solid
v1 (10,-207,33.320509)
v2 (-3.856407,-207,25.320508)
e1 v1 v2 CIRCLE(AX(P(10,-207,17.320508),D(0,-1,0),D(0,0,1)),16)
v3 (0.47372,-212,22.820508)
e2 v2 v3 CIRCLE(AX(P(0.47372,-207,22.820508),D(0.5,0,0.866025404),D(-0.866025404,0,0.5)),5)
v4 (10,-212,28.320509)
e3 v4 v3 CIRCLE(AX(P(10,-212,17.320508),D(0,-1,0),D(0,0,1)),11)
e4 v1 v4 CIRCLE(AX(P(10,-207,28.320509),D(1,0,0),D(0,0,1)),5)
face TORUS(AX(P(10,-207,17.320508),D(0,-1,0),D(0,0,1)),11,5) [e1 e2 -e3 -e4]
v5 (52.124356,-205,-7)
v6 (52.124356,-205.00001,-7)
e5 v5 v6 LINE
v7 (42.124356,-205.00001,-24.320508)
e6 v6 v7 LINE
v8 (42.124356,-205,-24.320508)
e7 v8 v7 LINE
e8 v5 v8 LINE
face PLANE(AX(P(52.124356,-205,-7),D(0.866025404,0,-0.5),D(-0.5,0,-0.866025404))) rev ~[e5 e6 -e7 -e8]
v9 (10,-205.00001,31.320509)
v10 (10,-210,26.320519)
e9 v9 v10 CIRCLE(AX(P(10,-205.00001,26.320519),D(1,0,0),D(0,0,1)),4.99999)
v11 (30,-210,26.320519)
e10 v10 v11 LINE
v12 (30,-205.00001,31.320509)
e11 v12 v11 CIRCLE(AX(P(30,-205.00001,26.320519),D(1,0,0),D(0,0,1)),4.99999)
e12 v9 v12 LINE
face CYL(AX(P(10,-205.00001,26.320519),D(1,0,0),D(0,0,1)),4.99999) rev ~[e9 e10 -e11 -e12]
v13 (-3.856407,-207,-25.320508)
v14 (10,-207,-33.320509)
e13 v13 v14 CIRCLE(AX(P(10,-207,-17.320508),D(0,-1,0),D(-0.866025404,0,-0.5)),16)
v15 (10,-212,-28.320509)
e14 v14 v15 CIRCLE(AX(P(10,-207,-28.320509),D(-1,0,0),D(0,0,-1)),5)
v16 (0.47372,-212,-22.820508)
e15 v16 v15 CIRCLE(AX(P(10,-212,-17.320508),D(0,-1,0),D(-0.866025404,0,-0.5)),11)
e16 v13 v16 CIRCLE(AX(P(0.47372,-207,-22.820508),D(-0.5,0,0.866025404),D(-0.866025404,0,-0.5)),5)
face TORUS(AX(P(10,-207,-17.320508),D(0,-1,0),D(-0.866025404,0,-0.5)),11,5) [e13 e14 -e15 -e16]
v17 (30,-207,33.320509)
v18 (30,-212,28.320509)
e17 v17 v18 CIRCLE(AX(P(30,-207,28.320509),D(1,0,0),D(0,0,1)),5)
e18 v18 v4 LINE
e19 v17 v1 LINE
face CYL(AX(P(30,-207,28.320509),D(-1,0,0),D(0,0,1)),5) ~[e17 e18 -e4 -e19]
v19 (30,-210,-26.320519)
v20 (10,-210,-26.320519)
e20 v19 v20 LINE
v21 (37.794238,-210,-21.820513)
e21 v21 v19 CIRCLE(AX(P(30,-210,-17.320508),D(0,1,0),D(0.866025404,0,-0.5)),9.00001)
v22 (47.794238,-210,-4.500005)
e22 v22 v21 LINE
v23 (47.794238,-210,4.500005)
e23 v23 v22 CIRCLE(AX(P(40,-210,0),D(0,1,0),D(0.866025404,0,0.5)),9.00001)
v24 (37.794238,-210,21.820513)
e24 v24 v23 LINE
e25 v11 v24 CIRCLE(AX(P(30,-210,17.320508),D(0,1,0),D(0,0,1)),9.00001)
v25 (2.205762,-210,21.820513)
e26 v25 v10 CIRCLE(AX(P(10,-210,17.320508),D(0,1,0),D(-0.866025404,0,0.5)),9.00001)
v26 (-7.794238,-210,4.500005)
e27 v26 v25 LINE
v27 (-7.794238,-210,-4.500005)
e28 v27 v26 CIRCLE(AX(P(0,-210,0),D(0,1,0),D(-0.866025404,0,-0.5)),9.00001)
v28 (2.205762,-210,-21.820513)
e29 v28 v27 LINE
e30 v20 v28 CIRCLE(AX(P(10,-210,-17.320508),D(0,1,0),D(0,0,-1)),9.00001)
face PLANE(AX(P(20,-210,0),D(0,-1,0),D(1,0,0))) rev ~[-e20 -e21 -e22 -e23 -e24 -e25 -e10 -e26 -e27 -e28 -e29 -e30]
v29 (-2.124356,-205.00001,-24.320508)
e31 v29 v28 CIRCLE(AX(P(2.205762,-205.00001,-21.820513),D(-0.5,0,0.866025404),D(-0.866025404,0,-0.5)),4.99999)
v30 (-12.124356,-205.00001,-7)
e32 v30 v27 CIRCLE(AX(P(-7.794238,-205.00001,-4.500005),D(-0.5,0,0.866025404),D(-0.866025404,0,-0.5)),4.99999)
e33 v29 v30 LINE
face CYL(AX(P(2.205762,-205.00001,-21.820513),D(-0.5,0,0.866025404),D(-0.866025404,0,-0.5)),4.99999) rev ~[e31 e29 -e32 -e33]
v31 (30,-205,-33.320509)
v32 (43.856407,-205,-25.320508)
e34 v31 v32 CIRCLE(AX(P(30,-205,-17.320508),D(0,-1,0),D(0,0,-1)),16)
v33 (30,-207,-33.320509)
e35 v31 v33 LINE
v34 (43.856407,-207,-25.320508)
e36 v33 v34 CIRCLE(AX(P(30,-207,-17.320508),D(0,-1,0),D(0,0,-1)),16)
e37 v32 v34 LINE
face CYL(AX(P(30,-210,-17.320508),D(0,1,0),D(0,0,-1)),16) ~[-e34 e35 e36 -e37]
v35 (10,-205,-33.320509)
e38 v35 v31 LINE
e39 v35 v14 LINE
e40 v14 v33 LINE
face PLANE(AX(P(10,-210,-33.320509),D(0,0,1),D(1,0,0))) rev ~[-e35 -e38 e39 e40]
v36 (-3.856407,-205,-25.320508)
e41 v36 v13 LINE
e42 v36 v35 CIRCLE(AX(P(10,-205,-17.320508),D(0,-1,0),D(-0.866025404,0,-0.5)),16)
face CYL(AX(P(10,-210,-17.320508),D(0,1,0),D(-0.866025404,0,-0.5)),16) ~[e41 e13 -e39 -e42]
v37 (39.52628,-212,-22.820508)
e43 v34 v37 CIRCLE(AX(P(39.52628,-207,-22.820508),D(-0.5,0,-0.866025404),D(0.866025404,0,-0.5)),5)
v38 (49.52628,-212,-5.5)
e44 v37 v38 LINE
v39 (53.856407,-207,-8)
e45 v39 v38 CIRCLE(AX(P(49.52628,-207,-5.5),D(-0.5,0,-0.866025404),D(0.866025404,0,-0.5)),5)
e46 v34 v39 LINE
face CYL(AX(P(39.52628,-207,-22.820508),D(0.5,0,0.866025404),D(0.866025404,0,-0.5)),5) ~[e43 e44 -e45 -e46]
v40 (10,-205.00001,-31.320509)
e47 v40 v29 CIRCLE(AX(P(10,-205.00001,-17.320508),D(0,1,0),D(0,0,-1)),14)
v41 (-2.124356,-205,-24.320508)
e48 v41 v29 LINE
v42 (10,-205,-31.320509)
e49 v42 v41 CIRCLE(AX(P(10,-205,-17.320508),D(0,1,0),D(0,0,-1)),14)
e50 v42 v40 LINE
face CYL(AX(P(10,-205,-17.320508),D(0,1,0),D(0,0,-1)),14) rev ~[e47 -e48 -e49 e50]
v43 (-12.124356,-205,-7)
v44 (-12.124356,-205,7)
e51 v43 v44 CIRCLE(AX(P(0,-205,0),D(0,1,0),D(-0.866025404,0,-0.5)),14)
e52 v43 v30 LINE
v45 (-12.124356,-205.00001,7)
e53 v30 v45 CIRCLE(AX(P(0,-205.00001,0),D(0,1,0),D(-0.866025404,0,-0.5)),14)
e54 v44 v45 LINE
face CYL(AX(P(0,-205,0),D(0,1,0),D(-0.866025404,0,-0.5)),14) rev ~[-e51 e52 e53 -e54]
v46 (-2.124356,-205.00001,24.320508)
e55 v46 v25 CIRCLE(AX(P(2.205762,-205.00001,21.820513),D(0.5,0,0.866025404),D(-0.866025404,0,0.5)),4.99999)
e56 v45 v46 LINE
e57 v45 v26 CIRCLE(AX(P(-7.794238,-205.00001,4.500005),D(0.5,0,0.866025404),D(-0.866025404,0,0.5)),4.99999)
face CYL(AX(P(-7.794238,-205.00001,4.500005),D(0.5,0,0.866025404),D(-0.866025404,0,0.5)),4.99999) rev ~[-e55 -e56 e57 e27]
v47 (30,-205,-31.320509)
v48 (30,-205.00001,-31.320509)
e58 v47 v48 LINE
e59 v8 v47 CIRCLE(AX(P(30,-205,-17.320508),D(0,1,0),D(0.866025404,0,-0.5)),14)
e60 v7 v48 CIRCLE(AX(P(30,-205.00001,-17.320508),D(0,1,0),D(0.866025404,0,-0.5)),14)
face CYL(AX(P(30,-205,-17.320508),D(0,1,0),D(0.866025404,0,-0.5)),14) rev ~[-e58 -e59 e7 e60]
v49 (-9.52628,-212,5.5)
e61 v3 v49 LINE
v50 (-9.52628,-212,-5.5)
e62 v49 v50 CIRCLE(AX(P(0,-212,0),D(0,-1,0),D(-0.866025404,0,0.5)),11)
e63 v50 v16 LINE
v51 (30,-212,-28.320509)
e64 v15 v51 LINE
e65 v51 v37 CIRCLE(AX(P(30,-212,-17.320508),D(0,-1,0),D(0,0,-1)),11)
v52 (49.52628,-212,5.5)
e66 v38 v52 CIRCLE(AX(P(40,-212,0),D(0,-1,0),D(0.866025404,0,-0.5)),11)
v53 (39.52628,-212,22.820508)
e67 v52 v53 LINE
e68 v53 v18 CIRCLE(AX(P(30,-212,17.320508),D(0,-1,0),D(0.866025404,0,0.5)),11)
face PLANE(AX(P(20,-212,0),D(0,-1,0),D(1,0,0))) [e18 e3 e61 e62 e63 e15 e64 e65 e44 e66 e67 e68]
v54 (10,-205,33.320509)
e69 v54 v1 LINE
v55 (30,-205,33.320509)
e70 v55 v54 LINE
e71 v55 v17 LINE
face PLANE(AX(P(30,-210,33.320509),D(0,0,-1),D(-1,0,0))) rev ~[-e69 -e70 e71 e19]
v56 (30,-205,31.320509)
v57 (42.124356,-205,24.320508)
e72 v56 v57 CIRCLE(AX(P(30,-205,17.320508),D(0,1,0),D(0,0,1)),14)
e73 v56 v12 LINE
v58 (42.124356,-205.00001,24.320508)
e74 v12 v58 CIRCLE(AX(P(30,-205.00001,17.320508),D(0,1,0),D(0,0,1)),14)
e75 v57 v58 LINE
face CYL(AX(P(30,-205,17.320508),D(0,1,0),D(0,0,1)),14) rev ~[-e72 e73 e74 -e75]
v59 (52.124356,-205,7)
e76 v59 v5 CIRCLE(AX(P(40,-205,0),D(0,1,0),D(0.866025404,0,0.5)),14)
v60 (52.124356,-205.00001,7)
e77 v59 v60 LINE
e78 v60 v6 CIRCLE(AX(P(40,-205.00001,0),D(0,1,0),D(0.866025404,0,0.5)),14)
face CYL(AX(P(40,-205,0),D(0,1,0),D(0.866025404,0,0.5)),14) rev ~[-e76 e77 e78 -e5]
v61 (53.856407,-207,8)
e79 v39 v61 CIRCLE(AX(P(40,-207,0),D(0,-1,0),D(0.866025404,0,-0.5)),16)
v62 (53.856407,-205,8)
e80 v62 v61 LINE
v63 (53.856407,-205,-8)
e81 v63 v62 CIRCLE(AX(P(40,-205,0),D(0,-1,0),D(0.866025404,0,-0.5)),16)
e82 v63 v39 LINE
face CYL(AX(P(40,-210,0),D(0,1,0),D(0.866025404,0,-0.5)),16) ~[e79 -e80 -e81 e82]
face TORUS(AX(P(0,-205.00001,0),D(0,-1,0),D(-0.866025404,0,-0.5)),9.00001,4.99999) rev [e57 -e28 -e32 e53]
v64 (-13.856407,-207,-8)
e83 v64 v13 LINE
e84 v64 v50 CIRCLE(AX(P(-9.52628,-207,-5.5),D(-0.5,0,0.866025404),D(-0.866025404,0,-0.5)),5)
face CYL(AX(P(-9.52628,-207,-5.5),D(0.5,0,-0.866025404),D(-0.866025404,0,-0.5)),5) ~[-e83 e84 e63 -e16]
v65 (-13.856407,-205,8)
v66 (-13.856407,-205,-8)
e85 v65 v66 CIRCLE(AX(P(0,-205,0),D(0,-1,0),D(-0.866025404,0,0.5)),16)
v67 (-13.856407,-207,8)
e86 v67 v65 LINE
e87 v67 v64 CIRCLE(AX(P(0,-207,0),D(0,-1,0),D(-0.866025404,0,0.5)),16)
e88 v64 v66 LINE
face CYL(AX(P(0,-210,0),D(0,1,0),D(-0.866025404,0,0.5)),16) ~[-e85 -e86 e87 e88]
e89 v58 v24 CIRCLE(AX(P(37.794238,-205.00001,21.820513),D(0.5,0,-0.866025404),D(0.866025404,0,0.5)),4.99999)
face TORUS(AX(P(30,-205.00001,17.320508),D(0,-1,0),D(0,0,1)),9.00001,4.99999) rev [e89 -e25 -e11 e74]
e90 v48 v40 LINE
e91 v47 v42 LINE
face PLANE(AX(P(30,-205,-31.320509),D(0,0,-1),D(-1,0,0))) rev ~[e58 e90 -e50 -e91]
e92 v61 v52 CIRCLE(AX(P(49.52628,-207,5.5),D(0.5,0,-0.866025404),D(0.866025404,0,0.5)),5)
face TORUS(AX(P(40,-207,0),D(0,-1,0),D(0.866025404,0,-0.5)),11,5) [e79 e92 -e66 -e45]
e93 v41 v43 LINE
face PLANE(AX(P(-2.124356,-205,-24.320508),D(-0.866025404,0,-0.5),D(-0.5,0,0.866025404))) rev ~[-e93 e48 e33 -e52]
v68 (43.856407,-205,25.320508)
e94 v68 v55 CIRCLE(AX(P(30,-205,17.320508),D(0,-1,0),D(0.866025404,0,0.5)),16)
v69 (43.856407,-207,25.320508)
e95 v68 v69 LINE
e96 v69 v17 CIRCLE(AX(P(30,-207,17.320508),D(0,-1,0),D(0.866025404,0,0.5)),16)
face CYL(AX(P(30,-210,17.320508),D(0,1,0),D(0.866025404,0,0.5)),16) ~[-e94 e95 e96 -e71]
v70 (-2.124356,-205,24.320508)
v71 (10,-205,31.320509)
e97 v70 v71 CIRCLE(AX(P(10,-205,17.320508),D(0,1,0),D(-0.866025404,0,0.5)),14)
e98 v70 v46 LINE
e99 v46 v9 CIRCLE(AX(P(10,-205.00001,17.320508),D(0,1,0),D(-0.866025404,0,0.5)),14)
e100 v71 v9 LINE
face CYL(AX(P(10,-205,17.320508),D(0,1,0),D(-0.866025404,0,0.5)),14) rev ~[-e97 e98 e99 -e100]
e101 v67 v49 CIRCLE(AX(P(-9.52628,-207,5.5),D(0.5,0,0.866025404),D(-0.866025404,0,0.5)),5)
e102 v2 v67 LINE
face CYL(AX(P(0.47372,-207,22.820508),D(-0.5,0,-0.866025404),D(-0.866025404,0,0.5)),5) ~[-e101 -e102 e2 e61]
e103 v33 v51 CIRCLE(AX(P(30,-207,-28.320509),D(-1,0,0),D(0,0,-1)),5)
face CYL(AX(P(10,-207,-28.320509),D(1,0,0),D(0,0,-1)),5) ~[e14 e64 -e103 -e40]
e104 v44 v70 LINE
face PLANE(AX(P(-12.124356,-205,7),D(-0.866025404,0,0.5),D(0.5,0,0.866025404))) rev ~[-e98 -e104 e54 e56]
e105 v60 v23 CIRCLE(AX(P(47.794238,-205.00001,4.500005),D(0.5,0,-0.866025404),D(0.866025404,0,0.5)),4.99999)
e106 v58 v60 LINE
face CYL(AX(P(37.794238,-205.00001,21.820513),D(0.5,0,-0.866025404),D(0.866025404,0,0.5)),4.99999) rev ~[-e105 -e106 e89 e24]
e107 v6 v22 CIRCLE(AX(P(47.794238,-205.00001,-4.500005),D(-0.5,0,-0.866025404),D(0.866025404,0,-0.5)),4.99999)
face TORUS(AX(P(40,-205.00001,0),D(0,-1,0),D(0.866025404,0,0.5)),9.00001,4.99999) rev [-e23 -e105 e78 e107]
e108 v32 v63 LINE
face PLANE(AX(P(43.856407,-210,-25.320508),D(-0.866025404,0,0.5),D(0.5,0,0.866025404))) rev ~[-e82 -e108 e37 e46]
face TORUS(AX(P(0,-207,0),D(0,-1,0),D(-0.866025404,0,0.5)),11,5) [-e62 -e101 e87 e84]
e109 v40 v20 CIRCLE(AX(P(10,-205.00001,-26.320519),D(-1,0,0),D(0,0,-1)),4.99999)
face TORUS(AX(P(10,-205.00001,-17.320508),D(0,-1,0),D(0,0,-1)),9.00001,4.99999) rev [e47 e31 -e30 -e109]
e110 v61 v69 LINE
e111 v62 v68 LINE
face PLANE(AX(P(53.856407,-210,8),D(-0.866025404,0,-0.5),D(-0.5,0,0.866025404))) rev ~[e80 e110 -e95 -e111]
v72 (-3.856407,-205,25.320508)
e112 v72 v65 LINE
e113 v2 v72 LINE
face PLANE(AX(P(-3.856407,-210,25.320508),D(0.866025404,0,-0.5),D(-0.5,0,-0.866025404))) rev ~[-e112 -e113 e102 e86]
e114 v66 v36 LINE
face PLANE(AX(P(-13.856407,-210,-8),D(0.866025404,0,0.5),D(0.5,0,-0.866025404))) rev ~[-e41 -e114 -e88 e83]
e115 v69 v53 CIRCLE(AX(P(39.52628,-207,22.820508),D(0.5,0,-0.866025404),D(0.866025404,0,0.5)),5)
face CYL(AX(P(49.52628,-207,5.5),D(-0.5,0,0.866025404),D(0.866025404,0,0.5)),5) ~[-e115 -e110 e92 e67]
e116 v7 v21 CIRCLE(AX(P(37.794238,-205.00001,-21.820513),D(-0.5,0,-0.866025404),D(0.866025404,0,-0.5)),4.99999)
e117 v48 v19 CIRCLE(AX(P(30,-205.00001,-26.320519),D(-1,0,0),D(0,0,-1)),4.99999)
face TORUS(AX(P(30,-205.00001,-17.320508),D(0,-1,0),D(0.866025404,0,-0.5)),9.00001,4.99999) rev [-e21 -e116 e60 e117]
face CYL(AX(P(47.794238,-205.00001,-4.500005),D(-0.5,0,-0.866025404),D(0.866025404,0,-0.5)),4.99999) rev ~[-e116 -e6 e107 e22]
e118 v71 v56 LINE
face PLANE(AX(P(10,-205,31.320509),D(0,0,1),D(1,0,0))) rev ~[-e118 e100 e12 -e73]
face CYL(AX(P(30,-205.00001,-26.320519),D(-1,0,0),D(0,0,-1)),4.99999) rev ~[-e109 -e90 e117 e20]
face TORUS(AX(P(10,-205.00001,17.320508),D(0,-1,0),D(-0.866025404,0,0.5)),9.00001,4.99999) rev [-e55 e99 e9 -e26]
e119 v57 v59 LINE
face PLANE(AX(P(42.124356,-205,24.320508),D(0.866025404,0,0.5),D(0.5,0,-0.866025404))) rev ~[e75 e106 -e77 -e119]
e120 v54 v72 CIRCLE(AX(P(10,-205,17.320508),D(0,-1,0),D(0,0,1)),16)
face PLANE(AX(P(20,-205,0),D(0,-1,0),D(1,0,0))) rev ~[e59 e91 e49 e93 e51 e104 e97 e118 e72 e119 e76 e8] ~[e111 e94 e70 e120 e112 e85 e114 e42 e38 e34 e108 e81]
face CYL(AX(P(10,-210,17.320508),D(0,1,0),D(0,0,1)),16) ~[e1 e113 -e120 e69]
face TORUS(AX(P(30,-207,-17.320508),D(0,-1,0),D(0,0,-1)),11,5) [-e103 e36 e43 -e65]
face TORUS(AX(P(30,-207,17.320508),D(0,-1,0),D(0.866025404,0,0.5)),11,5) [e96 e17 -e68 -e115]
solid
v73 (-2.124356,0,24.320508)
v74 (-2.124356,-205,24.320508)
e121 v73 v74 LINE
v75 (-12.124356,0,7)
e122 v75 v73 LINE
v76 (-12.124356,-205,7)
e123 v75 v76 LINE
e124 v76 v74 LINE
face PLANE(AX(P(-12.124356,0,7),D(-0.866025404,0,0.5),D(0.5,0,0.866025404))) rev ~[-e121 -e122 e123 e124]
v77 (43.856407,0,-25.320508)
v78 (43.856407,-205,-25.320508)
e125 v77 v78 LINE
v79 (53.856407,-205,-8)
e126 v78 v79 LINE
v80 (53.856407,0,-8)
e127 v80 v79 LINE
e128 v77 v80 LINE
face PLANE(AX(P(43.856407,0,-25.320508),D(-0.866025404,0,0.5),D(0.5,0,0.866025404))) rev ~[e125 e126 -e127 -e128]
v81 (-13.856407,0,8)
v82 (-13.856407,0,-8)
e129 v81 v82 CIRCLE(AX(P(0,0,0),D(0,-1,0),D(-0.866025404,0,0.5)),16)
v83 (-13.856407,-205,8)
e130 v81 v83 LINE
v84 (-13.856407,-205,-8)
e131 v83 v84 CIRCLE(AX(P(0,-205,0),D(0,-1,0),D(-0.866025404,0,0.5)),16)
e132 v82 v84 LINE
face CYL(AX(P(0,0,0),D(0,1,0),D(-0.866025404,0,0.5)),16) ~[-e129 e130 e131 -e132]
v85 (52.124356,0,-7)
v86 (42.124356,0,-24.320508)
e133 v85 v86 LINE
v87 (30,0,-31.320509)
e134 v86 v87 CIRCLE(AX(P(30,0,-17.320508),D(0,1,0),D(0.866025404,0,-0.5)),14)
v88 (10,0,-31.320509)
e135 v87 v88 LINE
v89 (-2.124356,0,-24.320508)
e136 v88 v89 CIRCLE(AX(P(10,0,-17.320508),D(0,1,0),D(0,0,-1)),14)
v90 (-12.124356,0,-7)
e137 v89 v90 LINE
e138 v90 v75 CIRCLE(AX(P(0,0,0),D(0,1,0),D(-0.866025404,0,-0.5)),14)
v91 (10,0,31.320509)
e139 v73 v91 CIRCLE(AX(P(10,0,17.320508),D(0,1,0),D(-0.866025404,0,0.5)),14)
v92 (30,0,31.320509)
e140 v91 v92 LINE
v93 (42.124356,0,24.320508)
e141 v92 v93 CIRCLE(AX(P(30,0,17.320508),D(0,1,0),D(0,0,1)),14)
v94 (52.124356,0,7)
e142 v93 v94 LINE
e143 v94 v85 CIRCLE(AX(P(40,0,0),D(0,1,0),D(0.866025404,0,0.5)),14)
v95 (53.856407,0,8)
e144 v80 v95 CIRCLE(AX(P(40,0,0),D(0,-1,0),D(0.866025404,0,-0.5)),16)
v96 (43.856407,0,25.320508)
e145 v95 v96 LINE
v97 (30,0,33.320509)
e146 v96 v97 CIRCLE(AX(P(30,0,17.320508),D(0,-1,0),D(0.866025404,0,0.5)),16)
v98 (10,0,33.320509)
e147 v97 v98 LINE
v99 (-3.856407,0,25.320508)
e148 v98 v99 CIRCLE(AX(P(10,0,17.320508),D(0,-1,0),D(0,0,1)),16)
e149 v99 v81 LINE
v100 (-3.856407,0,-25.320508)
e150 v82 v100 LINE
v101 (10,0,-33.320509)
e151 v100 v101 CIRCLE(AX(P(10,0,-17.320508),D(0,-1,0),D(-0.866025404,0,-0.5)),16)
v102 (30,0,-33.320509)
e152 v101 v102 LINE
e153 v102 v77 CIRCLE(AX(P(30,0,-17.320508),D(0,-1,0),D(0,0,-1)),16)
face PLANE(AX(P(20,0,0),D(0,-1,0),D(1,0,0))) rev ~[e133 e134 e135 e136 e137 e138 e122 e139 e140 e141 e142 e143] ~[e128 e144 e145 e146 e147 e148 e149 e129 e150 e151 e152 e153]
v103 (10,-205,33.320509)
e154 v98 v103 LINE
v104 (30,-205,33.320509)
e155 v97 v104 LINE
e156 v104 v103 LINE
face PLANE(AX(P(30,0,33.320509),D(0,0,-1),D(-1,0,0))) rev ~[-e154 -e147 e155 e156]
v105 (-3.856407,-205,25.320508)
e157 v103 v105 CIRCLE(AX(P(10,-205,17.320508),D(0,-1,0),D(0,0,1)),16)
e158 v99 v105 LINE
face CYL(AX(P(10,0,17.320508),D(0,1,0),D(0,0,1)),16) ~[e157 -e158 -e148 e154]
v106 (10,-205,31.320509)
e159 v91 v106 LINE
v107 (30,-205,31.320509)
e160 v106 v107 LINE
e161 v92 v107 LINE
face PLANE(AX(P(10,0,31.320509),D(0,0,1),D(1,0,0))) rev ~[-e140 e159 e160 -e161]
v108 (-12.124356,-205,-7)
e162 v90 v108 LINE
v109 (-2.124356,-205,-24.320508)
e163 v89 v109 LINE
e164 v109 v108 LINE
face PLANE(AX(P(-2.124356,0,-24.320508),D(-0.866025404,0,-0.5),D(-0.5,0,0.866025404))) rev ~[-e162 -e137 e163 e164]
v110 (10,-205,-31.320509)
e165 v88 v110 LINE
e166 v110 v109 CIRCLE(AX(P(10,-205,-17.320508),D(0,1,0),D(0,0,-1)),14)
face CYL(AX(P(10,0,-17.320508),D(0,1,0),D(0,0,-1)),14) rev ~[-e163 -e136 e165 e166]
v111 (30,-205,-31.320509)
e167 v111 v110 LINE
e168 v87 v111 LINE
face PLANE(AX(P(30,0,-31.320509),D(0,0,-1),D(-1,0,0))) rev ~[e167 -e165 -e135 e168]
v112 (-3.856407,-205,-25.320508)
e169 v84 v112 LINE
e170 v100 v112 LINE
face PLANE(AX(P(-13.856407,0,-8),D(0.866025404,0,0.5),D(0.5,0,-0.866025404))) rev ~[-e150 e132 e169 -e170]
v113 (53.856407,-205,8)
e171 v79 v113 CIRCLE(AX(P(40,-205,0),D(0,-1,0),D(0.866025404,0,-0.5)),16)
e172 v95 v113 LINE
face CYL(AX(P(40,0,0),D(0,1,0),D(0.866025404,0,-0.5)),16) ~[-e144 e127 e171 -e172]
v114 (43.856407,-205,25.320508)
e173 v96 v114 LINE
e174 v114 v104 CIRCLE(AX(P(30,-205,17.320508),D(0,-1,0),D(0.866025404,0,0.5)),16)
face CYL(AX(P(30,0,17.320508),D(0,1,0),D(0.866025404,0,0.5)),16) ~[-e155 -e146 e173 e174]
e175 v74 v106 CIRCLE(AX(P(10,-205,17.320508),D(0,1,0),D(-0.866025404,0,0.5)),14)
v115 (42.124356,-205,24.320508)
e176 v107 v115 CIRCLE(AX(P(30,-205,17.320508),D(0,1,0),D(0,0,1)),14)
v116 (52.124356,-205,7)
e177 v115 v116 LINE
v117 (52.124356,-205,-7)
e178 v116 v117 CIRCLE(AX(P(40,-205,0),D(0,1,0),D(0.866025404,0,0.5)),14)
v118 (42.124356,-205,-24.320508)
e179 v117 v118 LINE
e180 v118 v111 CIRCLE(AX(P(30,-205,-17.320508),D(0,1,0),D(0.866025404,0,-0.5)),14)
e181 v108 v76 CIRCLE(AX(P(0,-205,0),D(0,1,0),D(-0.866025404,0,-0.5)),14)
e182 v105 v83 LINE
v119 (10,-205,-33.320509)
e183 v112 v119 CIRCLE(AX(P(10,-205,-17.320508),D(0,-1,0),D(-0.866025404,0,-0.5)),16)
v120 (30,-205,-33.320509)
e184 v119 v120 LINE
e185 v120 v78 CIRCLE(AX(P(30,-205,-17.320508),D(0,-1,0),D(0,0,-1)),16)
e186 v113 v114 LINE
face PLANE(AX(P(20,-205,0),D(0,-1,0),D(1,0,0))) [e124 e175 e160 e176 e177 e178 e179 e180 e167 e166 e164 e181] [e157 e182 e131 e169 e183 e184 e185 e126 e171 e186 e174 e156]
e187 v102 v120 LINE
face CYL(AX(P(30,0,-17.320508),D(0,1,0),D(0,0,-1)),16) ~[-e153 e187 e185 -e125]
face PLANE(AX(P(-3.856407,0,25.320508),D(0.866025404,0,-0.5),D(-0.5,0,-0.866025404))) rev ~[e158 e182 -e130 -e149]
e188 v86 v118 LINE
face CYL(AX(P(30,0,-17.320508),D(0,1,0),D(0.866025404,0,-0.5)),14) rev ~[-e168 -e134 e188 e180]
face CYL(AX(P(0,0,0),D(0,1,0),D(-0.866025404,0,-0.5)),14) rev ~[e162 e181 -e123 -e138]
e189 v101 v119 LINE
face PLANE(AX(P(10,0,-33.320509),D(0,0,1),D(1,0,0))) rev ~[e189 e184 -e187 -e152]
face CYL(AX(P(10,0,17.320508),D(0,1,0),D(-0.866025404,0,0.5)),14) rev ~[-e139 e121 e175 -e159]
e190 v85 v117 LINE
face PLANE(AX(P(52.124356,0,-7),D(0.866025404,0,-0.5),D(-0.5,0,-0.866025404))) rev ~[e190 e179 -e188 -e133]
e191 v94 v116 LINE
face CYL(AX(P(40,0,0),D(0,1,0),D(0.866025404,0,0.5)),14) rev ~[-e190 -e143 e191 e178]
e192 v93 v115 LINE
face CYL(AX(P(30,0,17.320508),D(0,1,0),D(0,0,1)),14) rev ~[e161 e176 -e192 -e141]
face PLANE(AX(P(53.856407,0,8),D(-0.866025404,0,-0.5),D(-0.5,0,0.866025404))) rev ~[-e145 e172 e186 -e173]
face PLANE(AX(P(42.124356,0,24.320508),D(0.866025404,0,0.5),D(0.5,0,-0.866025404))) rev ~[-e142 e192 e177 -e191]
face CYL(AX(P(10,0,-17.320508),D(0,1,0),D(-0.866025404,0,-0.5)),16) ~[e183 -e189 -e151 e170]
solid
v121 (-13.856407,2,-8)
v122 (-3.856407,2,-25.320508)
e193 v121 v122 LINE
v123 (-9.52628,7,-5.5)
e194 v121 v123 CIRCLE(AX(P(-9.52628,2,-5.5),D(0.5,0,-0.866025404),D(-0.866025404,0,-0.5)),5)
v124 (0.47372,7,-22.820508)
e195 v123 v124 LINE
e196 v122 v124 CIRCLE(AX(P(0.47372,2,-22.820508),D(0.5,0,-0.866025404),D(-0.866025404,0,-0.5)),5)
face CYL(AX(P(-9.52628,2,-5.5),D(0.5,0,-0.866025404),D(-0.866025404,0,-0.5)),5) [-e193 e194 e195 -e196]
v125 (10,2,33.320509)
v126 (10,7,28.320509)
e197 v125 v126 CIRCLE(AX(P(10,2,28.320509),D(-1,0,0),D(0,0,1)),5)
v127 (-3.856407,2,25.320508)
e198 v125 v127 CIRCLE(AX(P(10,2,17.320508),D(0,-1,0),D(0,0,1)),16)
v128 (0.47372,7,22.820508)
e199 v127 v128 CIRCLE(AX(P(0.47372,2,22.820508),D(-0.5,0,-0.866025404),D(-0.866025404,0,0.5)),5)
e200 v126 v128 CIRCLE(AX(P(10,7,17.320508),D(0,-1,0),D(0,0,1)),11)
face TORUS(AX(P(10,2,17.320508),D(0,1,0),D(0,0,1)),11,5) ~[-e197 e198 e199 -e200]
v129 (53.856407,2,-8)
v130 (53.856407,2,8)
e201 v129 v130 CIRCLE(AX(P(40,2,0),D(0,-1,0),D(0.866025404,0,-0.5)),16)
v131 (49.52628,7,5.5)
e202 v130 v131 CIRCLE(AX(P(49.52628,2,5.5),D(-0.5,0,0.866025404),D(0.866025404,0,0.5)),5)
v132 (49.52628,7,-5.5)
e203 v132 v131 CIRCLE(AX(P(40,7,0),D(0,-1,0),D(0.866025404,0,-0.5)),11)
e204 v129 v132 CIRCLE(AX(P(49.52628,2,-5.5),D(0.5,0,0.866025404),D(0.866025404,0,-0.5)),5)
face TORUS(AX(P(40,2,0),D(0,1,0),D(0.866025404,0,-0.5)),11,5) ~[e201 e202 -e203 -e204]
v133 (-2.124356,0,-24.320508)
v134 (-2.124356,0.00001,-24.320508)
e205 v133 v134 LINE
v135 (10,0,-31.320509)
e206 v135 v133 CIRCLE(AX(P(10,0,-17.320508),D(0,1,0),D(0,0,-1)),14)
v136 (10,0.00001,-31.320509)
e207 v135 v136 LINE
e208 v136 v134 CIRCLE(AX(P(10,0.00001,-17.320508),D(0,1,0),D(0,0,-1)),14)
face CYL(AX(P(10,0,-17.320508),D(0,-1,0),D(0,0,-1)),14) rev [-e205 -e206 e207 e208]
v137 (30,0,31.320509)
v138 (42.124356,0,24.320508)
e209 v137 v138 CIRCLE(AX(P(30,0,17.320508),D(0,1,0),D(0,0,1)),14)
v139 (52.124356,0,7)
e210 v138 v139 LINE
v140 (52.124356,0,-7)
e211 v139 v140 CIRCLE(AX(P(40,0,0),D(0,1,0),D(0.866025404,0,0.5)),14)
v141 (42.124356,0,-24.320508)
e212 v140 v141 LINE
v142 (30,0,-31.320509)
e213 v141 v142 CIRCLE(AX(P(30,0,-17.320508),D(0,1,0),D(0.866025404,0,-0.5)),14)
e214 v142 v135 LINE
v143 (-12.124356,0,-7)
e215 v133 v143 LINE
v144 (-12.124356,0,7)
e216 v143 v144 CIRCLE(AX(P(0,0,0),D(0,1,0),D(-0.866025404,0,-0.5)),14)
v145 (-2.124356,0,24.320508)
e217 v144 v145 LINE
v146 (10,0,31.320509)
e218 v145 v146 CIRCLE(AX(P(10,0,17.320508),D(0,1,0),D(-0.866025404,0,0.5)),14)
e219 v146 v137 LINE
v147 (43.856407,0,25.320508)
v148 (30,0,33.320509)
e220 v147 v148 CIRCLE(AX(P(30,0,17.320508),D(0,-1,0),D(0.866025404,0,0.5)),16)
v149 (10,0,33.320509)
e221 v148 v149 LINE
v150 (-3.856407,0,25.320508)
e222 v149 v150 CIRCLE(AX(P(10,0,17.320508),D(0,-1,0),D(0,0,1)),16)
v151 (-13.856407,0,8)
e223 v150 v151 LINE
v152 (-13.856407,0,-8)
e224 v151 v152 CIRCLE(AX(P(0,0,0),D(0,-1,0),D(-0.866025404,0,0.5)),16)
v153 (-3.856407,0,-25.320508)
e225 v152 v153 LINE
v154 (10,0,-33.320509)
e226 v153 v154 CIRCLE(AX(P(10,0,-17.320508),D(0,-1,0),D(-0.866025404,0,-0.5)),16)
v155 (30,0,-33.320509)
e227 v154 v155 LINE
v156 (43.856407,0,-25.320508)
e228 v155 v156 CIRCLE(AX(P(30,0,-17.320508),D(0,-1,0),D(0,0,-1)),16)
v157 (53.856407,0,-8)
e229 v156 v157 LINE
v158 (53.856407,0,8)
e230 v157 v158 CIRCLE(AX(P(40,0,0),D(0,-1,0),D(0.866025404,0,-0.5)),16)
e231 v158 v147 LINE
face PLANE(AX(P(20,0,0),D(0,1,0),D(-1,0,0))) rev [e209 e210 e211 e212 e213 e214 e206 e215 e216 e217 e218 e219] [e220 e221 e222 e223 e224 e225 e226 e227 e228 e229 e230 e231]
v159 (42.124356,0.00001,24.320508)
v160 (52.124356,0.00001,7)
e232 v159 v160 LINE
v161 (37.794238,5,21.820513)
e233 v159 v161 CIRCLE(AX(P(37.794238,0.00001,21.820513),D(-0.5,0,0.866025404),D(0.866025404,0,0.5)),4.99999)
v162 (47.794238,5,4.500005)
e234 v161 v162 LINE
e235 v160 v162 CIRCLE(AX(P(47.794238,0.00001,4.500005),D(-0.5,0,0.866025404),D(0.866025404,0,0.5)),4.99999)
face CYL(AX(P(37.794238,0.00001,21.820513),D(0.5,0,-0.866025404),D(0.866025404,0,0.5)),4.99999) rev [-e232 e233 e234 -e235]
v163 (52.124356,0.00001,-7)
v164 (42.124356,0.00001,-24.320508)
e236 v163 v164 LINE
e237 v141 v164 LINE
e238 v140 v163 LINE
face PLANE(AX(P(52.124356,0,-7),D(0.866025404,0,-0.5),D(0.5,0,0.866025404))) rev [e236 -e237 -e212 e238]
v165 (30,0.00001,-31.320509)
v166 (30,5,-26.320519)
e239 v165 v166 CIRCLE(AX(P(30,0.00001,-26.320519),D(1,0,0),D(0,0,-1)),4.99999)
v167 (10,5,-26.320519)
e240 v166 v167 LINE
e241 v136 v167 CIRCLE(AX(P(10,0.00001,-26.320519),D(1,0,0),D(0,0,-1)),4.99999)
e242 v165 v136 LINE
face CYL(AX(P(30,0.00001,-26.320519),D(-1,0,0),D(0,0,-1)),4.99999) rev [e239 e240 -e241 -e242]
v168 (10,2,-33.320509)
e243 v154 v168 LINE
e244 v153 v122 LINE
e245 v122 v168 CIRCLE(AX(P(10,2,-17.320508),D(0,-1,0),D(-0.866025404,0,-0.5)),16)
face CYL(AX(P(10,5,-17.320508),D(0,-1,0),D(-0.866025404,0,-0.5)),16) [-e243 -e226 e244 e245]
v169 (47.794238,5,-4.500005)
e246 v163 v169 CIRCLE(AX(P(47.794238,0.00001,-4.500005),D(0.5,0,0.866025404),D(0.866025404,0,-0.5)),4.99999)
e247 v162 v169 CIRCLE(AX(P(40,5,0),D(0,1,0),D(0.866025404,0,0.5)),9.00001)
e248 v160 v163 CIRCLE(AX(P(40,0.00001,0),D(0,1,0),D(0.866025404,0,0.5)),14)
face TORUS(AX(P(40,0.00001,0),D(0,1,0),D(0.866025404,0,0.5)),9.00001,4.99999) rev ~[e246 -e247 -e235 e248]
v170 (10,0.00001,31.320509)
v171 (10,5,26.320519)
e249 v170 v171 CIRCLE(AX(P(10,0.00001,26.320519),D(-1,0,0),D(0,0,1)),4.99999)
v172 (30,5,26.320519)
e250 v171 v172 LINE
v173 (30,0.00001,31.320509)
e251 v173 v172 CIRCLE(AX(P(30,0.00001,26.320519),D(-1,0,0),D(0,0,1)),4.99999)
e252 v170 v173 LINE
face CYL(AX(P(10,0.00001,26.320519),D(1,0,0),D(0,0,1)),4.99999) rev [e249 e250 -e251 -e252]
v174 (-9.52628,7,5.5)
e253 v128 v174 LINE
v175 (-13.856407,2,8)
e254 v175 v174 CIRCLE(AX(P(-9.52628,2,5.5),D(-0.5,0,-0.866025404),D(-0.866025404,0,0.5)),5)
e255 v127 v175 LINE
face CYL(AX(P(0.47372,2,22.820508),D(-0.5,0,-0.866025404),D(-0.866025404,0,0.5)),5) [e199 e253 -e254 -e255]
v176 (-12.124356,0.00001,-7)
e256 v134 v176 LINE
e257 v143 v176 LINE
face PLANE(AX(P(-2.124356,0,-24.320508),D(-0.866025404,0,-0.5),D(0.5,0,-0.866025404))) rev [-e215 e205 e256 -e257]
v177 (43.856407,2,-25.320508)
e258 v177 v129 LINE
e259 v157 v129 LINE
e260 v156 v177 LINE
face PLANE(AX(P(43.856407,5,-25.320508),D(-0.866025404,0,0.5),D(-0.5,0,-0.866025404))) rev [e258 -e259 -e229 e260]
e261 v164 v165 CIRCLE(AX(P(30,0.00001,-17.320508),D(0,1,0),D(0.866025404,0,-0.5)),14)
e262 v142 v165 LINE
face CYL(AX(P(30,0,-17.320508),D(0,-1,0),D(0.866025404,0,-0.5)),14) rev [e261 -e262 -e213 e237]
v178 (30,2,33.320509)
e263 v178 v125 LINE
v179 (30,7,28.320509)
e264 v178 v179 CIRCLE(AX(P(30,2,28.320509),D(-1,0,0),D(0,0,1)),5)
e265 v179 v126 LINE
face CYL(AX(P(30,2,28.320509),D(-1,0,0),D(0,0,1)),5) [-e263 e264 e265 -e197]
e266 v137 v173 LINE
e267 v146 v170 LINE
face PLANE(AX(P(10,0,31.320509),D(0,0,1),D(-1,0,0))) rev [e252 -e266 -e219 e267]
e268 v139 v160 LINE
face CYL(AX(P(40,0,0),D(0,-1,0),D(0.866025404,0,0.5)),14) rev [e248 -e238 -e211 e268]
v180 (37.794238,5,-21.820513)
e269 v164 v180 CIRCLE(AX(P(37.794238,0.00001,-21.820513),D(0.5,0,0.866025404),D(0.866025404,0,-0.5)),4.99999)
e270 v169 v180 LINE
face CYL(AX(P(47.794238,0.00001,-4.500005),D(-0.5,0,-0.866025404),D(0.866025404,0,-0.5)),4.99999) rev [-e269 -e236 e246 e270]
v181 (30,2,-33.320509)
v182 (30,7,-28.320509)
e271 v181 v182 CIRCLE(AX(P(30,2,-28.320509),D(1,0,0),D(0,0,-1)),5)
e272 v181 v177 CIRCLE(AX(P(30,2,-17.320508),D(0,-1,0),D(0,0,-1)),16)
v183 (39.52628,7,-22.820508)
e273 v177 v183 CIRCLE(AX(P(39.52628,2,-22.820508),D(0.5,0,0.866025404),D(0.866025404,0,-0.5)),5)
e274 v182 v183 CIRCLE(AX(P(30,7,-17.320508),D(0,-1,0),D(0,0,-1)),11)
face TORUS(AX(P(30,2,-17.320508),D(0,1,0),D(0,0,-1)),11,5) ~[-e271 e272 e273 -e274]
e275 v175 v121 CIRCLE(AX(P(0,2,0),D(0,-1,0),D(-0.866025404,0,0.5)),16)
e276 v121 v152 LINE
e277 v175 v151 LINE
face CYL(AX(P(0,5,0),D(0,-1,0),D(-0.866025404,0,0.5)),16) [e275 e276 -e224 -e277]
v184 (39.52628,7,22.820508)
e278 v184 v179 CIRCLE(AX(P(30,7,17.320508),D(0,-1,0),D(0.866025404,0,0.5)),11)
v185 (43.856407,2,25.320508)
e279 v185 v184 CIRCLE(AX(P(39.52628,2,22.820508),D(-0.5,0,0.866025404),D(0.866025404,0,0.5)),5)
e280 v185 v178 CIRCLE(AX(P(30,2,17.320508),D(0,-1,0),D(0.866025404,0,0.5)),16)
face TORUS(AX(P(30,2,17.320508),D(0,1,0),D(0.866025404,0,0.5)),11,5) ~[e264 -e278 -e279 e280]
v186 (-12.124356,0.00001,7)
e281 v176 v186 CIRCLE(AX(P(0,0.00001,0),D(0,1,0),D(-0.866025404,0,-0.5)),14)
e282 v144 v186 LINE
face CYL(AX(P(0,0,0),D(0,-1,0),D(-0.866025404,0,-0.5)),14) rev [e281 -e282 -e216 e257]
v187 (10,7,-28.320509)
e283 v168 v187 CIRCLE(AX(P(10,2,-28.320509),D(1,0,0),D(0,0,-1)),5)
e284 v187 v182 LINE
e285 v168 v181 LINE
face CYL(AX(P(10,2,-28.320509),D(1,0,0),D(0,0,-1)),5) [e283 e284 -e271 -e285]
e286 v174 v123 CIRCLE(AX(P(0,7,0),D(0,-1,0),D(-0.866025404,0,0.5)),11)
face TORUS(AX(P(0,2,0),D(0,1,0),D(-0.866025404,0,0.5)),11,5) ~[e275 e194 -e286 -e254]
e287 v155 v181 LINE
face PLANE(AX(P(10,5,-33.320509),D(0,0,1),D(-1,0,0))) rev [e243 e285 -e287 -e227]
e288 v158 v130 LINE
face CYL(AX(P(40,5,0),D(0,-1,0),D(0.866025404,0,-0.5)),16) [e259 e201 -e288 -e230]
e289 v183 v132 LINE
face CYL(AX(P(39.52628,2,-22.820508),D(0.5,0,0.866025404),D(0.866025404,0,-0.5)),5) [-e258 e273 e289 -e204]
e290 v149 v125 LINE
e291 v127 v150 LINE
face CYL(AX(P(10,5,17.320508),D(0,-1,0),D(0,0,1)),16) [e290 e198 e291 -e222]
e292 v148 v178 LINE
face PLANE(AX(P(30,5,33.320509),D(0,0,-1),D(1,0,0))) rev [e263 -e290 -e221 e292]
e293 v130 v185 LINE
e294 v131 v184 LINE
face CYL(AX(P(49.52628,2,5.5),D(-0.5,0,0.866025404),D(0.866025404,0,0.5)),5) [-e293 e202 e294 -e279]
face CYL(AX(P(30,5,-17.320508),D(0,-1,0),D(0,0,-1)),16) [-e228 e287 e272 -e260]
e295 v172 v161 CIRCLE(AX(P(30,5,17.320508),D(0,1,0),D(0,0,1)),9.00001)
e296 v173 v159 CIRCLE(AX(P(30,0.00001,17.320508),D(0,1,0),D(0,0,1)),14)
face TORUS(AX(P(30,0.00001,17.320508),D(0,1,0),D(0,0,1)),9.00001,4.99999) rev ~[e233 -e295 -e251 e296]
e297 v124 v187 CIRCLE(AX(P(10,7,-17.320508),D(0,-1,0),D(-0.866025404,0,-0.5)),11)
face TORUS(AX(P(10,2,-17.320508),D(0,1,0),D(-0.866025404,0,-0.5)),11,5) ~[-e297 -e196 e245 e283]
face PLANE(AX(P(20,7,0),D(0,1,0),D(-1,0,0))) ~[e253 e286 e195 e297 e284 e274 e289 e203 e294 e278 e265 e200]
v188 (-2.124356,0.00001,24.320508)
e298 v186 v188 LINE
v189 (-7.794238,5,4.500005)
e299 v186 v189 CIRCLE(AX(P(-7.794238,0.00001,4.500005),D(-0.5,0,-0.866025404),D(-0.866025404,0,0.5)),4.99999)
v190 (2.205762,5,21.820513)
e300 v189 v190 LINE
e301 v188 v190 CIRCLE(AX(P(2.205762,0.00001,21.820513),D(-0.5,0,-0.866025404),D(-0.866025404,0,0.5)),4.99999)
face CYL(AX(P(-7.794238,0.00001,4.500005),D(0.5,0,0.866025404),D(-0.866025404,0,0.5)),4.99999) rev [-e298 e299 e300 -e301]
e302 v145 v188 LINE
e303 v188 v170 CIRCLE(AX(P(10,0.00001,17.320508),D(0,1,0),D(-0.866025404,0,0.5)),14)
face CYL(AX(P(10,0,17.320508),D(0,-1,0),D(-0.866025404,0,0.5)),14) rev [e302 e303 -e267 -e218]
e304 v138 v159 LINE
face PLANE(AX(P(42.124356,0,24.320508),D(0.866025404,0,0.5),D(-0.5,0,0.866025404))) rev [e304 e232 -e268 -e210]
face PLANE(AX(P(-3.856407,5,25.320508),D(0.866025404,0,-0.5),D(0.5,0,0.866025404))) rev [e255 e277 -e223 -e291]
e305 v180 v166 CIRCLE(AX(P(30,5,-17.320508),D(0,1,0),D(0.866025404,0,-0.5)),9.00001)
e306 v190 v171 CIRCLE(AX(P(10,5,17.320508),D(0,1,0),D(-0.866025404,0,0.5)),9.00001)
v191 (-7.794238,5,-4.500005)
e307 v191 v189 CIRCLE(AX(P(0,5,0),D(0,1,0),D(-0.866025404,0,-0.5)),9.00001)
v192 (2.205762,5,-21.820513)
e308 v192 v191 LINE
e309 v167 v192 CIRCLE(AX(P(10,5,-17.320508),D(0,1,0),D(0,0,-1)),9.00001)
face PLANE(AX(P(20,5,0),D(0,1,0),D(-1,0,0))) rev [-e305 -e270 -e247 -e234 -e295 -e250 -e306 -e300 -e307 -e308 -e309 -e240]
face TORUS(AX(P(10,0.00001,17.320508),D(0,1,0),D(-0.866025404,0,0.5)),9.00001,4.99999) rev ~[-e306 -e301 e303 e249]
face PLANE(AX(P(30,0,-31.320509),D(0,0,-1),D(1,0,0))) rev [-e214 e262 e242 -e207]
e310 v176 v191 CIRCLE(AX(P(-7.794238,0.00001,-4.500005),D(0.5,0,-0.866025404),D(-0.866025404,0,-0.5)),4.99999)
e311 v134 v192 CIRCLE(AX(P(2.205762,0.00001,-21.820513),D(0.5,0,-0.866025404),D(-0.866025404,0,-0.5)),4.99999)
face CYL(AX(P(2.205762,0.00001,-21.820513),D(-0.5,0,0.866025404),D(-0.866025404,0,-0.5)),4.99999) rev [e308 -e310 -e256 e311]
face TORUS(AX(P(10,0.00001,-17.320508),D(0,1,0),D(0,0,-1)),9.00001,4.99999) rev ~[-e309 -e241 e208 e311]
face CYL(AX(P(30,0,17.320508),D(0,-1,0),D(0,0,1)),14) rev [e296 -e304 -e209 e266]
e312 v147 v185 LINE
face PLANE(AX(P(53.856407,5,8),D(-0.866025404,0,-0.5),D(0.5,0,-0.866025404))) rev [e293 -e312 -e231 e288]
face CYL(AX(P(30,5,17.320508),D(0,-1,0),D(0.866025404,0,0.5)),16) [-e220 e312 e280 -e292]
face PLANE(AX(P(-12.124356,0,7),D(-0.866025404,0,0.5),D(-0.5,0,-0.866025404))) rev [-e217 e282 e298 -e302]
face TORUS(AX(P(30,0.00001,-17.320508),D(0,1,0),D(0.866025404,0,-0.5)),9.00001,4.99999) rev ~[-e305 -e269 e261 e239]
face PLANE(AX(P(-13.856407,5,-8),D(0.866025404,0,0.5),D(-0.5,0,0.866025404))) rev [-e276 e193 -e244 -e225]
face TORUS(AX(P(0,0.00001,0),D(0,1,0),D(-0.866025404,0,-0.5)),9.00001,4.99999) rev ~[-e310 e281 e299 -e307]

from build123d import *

# Parameters (mm, degrees)
F2_DEPTH = 205
F4_DEPTH = 5
F6_DEPTH = 2
F7_R     = 5
F8_R     = 4.99999


# Not quite as in the source:
# - a fillet or chamfer is up to 0.001 mm smaller than in the source, because OpenCascade refuses the exact size


with BuildPart() as f2:
    # F1 (on Front) → F2 (new body)
    with BuildSketch(Plane.XZ):
        with BuildLine():
            Line((30, 33.3205085668), (10, 33.3205085668))
            ThreePointArc((10, 33.3205085668), (1.9999997545, 31.1769149615), (-3.8564068859, 25.3205083212))
            Line((-3.8564068859, 25.3205083212), (-13.8564068859, 8.0000002455))
            ThreePointArc((-13.8564068859, 8.0000002455), (-16.0000004911, 0), (-13.8564068859, -8.0000002455))
            Line((-13.8564068859, -8.0000002455), (-3.8564068859, -25.3205083212))
            ThreePointArc((-3.8564068859, -25.3205083212), (1.9999997545, -31.1769149615), (10, -33.3205085668))
            Line((10, -33.3205085668), (30, -33.3205085668))
            ThreePointArc((30, -33.3205085668), (38.0000002455, -31.1769149615), (43.8564068859, -25.3205083212))
            Line((43.8564068859, -25.3205083212), (53.8564068859, -8.0000002455))
            ThreePointArc((53.8564068859, -8.0000002455), (56.0000004911, 0), (53.8564068859, 8.0000002455))
            Line((53.8564068859, 8.0000002455), (43.8564068859, 25.3205083212))
            ThreePointArc((43.8564068859, 25.3205083212), (38.0000002455, 31.1769149615), (30, 33.3205085668))
        make_face()
        with BuildLine():
            ThreePointArc((-2.1243560783, 24.3205083212), (2.9999997545, 29.444864154), (10, 31.3205085668))
            Line((10, 31.3205085668), (30, 31.3205085668))
            ThreePointArc((30, 31.3205085668), (37.0000002455, 29.444864154), (42.1243560783, 24.3205083212))
            Line((42.1243560783, 24.3205083212), (52.1243560783, 7.0000002455))
            ThreePointArc((52.1243560783, 7.0000002455), (54.0000004911, 0), (52.1243560783, -7.0000002455))
            Line((52.1243560783, -7.0000002455), (42.1243560783, -24.3205083212))
            ThreePointArc((42.1243560783, -24.3205083212), (37.0000002455, -29.444864154), (30, -31.3205085668))
            Line((30, -31.3205085668), (10, -31.3205085668))
            ThreePointArc((10, -31.3205085668), (2.9999997545, -29.444864154), (-2.1243560783, -24.3205083212))
            Line((-2.1243560783, -24.3205083212), (-12.1243560783, -7.0000002455))
            ThreePointArc((-12.1243560783, -7.0000002455), (-14.0000004911, 0), (-12.1243560783, 7.0000002455))
            Line((-12.1243560783, 7.0000002455), (-2.1243560783, 24.3205083212))
        make_face(mode=Mode.SUBTRACT)
    extrude(amount=F2_DEPTH)


with BuildPart() as f4:
    # F3 (on face) → F4 (new body)
    with BuildSketch(Plane.XZ.offset(205)):
        with BuildLine():
            ThreePointArc((-3.8564068859, -25.3205083212), (1.9999997545, -31.1769149615), (10, -33.3205085668))
            Line((10, -33.3205085668), (30, -33.3205085668))
            ThreePointArc((30, -33.3205085668), (38.0000002455, -31.1769149615), (43.8564068859, -25.3205083212))
            Line((43.8564068859, -25.3205083212), (53.8564068859, -8.0000002455))
            ThreePointArc((53.8564068859, -8.0000002455), (56.0000004911, 0), (53.8564068859, 8.0000002455))
            Line((53.8564068859, 8.0000002455), (43.8564068859, 25.3205083212))
            ThreePointArc((43.8564068859, 25.3205083212), (38.0000002455, 31.1769149615), (30, 33.3205085668))
            Line((30, 33.3205085668), (10, 33.3205085668))
            ThreePointArc((10, 33.3205085668), (1.9999997545, 31.1769149615), (-3.8564068859, 25.3205083212))
            Line((-3.8564068859, 25.3205083212), (-13.8564068859, 8.0000002455))
            ThreePointArc((-13.8564068859, 8.0000002455), (-16.0000004911, 0), (-13.8564068859, -8.0000002455))
            Line((-13.8564068859, -8.0000002455), (-3.8564068859, -25.3205083212))
        make_face()
        with BuildLine():
            ThreePointArc((-2.1243560783, 24.3205083212), (2.9999997545, 29.444864154), (10, 31.3205085668))
            Line((10, 31.3205085668), (30, 31.3205085668))
            ThreePointArc((30, 31.3205085668), (37.0000002455, 29.444864154), (42.1243560783, 24.3205083212))
            Line((42.1243560783, 24.3205083212), (52.1243560783, 7.0000002455))
            ThreePointArc((52.1243560783, 7.0000002455), (54.0000004911, 0), (52.1243560783, -7.0000002455))
            Line((52.1243560783, -7.0000002455), (42.1243560783, -24.3205083212))
            ThreePointArc((42.1243560783, -24.3205083212), (37.0000002455, -29.444864154), (30, -31.3205085668))
            Line((30, -31.3205085668), (10, -31.3205085668))
            ThreePointArc((10, -31.3205085668), (2.9999997545, -29.444864154), (-2.1243560783, -24.3205083212))
            Line((-2.1243560783, -24.3205083212), (-12.1243560783, -7.0000002455))
            ThreePointArc((-12.1243560783, -7.0000002455), (-14.0000004911, 0), (-12.1243560783, 7.0000002455))
            Line((-12.1243560783, 7.0000002455), (-2.1243560783, 24.3205083212))
        make_face(mode=Mode.SUBTRACT)
    extrude(amount=F4_DEPTH)

    # F5 (on face) → F6 (join)
    with BuildSketch(Plane.XZ.offset(210)):
        with BuildLine():
            Line((-13.8564068859, -8.0000002455), (-3.8564068859, -25.3205083212))
            ThreePointArc((-3.8564068859, -25.3205083212), (1.9999997545, -31.1769149615), (10, -33.3205085668))
            Line((10, -33.3205085668), (30, -33.3205085668))
            ThreePointArc((30, -33.3205085668), (38.0000002455, -31.1769149615), (43.8564068859, -25.3205083212))
            Line((43.8564068859, -25.3205083212), (53.8564068859, -8.0000002455))
            ThreePointArc((53.8564068859, -8.0000002455), (56.0000004911, 0), (53.8564068859, 8.0000002455))
            Line((53.8564068859, 8.0000002455), (43.8564068859, 25.3205083212))
            ThreePointArc((43.8564068859, 25.3205083212), (38.0000002455, 31.1769149615), (30, 33.3205085668))
            Line((30, 33.3205085668), (10, 33.3205085668))
            ThreePointArc((10, 33.3205085668), (1.9999997545, 31.1769149615), (-3.8564068859, 25.3205083212))
            Line((-3.8564068859, 25.3205083212), (-13.8564068859, 8.0000002455))
            ThreePointArc((-13.8564068859, 8.0000002455), (-16.0000004911, 0), (-13.8564068859, -8.0000002455))
        make_face()
        with BuildLine():
            ThreePointArc((10, -31.3205085668), (2.9999997545, -29.444864154), (-2.1243560783, -24.3205083212))
            Line((-2.1243560783, -24.3205083212), (-12.1243560783, -7.0000002455))
            ThreePointArc((-12.1243560783, -7.0000002455), (-14.0000004911, 0), (-12.1243560783, 7.0000002455))
            Line((-12.1243560783, 7.0000002455), (-2.1243560783, 24.3205083212))
            ThreePointArc((-2.1243560783, 24.3205083212), (2.9999997545, 29.444864154), (10, 31.3205085668))
            Line((10, 31.3205085668), (30, 31.3205085668))
            ThreePointArc((30, 31.3205085668), (37.0000002455, 29.444864154), (42.1243560783, 24.3205083212))
            Line((42.1243560783, 24.3205083212), (52.1243560783, 7.0000002455))
            ThreePointArc((52.1243560783, 7.0000002455), (54.0000004911, 0), (52.1243560783, -7.0000002455))
            Line((52.1243560783, -7.0000002455), (42.1243560783, -24.3205083212))
            ThreePointArc((42.1243560783, -24.3205083212), (37.0000002455, -29.444864154), (30, -31.3205085668))
            Line((30, -31.3205085668), (10, -31.3205085668))
        make_face(mode=Mode.SUBTRACT)
        with BuildLine():
            Line((-12.1243560783, -7.0000002455), (-2.1243560783, -24.3205083212))
            ThreePointArc((-2.1243560783, -24.3205083212), (2.9999997545, -29.444864154), (10, -31.3205085668))
            Line((10, -31.3205085668), (30, -31.3205085668))
            ThreePointArc((30, -31.3205085668), (37.0000002455, -29.444864154), (42.1243560783, -24.3205083212))
            Line((42.1243560783, -24.3205083212), (52.1243560783, -7.0000002455))
            ThreePointArc((52.1243560783, -7.0000002455), (54.0000004911, 0), (52.1243560783, 7.0000002455))
            Line((52.1243560783, 7.0000002455), (42.1243560783, 24.3205083212))
            ThreePointArc((42.1243560783, 24.3205083212), (37.0000002455, 29.444864154), (30, 31.3205085668))
            Line((30, 31.3205085668), (10, 31.3205085668))
            ThreePointArc((10, 31.3205085668), (2.9999997545, 29.444864154), (-2.1243560783, 24.3205083212))
            Line((-2.1243560783, 24.3205083212), (-12.1243560783, 7.0000002455))
            ThreePointArc((-12.1243560783, 7.0000002455), (-14.0000004911, 0), (-12.1243560783, -7.0000002455))
        make_face()
    extrude(amount=F6_DEPTH)

    # F7
    f7_edges = [f4.edges().sort_by_distance(p)[0] for p in [
        (-8.856407, -212, -16.660254),
        (2, -212, -31.176915),
        (20, -212, -33.320509),
        (38, -212, -31.176915),
        (48.856407, -212, -16.660254),
        (56, -212, 0),
        (48.856407, -212, 16.660254),
        (38, -212, 31.176915),
        (20, -212, 33.320509),
        (2, -212, 31.176915),
        (-8.856407, -212, 16.660254),
        (-16, -212, 0),
    ]]
    fillet(f7_edges, radius=F7_R)

    # F8 (radius 5 in the source; OpenCascade refuses exactly that, so slightly less here)
    f8_edges = [f4.edges().sort_by_distance(p)[0] for p in [
        (-7.124356, -210, -15.660254),
        (-14, -210, 0),
        (-7.124356, -210, 15.660254),
        (3, -210, 29.444864),
        (20, -210, 31.320509),
        (37, -210, 29.444864),
        (47.124356, -210, 15.660254),
        (54, -210, 0),
        (47.124356, -210, -15.660254),
        (37, -210, -29.444864),
        (20, -210, -31.320509),
        (3, -210, -29.444864),
    ]]
    fillet(f8_edges, radius=F8_R)


with BuildPart() as f10_1:
    # F10: instance of F4
    add(f4.part.mirror(Plane.XZ.offset(102.5)))


solid = Compound([f2.part, f4.part, f10_1.part])
